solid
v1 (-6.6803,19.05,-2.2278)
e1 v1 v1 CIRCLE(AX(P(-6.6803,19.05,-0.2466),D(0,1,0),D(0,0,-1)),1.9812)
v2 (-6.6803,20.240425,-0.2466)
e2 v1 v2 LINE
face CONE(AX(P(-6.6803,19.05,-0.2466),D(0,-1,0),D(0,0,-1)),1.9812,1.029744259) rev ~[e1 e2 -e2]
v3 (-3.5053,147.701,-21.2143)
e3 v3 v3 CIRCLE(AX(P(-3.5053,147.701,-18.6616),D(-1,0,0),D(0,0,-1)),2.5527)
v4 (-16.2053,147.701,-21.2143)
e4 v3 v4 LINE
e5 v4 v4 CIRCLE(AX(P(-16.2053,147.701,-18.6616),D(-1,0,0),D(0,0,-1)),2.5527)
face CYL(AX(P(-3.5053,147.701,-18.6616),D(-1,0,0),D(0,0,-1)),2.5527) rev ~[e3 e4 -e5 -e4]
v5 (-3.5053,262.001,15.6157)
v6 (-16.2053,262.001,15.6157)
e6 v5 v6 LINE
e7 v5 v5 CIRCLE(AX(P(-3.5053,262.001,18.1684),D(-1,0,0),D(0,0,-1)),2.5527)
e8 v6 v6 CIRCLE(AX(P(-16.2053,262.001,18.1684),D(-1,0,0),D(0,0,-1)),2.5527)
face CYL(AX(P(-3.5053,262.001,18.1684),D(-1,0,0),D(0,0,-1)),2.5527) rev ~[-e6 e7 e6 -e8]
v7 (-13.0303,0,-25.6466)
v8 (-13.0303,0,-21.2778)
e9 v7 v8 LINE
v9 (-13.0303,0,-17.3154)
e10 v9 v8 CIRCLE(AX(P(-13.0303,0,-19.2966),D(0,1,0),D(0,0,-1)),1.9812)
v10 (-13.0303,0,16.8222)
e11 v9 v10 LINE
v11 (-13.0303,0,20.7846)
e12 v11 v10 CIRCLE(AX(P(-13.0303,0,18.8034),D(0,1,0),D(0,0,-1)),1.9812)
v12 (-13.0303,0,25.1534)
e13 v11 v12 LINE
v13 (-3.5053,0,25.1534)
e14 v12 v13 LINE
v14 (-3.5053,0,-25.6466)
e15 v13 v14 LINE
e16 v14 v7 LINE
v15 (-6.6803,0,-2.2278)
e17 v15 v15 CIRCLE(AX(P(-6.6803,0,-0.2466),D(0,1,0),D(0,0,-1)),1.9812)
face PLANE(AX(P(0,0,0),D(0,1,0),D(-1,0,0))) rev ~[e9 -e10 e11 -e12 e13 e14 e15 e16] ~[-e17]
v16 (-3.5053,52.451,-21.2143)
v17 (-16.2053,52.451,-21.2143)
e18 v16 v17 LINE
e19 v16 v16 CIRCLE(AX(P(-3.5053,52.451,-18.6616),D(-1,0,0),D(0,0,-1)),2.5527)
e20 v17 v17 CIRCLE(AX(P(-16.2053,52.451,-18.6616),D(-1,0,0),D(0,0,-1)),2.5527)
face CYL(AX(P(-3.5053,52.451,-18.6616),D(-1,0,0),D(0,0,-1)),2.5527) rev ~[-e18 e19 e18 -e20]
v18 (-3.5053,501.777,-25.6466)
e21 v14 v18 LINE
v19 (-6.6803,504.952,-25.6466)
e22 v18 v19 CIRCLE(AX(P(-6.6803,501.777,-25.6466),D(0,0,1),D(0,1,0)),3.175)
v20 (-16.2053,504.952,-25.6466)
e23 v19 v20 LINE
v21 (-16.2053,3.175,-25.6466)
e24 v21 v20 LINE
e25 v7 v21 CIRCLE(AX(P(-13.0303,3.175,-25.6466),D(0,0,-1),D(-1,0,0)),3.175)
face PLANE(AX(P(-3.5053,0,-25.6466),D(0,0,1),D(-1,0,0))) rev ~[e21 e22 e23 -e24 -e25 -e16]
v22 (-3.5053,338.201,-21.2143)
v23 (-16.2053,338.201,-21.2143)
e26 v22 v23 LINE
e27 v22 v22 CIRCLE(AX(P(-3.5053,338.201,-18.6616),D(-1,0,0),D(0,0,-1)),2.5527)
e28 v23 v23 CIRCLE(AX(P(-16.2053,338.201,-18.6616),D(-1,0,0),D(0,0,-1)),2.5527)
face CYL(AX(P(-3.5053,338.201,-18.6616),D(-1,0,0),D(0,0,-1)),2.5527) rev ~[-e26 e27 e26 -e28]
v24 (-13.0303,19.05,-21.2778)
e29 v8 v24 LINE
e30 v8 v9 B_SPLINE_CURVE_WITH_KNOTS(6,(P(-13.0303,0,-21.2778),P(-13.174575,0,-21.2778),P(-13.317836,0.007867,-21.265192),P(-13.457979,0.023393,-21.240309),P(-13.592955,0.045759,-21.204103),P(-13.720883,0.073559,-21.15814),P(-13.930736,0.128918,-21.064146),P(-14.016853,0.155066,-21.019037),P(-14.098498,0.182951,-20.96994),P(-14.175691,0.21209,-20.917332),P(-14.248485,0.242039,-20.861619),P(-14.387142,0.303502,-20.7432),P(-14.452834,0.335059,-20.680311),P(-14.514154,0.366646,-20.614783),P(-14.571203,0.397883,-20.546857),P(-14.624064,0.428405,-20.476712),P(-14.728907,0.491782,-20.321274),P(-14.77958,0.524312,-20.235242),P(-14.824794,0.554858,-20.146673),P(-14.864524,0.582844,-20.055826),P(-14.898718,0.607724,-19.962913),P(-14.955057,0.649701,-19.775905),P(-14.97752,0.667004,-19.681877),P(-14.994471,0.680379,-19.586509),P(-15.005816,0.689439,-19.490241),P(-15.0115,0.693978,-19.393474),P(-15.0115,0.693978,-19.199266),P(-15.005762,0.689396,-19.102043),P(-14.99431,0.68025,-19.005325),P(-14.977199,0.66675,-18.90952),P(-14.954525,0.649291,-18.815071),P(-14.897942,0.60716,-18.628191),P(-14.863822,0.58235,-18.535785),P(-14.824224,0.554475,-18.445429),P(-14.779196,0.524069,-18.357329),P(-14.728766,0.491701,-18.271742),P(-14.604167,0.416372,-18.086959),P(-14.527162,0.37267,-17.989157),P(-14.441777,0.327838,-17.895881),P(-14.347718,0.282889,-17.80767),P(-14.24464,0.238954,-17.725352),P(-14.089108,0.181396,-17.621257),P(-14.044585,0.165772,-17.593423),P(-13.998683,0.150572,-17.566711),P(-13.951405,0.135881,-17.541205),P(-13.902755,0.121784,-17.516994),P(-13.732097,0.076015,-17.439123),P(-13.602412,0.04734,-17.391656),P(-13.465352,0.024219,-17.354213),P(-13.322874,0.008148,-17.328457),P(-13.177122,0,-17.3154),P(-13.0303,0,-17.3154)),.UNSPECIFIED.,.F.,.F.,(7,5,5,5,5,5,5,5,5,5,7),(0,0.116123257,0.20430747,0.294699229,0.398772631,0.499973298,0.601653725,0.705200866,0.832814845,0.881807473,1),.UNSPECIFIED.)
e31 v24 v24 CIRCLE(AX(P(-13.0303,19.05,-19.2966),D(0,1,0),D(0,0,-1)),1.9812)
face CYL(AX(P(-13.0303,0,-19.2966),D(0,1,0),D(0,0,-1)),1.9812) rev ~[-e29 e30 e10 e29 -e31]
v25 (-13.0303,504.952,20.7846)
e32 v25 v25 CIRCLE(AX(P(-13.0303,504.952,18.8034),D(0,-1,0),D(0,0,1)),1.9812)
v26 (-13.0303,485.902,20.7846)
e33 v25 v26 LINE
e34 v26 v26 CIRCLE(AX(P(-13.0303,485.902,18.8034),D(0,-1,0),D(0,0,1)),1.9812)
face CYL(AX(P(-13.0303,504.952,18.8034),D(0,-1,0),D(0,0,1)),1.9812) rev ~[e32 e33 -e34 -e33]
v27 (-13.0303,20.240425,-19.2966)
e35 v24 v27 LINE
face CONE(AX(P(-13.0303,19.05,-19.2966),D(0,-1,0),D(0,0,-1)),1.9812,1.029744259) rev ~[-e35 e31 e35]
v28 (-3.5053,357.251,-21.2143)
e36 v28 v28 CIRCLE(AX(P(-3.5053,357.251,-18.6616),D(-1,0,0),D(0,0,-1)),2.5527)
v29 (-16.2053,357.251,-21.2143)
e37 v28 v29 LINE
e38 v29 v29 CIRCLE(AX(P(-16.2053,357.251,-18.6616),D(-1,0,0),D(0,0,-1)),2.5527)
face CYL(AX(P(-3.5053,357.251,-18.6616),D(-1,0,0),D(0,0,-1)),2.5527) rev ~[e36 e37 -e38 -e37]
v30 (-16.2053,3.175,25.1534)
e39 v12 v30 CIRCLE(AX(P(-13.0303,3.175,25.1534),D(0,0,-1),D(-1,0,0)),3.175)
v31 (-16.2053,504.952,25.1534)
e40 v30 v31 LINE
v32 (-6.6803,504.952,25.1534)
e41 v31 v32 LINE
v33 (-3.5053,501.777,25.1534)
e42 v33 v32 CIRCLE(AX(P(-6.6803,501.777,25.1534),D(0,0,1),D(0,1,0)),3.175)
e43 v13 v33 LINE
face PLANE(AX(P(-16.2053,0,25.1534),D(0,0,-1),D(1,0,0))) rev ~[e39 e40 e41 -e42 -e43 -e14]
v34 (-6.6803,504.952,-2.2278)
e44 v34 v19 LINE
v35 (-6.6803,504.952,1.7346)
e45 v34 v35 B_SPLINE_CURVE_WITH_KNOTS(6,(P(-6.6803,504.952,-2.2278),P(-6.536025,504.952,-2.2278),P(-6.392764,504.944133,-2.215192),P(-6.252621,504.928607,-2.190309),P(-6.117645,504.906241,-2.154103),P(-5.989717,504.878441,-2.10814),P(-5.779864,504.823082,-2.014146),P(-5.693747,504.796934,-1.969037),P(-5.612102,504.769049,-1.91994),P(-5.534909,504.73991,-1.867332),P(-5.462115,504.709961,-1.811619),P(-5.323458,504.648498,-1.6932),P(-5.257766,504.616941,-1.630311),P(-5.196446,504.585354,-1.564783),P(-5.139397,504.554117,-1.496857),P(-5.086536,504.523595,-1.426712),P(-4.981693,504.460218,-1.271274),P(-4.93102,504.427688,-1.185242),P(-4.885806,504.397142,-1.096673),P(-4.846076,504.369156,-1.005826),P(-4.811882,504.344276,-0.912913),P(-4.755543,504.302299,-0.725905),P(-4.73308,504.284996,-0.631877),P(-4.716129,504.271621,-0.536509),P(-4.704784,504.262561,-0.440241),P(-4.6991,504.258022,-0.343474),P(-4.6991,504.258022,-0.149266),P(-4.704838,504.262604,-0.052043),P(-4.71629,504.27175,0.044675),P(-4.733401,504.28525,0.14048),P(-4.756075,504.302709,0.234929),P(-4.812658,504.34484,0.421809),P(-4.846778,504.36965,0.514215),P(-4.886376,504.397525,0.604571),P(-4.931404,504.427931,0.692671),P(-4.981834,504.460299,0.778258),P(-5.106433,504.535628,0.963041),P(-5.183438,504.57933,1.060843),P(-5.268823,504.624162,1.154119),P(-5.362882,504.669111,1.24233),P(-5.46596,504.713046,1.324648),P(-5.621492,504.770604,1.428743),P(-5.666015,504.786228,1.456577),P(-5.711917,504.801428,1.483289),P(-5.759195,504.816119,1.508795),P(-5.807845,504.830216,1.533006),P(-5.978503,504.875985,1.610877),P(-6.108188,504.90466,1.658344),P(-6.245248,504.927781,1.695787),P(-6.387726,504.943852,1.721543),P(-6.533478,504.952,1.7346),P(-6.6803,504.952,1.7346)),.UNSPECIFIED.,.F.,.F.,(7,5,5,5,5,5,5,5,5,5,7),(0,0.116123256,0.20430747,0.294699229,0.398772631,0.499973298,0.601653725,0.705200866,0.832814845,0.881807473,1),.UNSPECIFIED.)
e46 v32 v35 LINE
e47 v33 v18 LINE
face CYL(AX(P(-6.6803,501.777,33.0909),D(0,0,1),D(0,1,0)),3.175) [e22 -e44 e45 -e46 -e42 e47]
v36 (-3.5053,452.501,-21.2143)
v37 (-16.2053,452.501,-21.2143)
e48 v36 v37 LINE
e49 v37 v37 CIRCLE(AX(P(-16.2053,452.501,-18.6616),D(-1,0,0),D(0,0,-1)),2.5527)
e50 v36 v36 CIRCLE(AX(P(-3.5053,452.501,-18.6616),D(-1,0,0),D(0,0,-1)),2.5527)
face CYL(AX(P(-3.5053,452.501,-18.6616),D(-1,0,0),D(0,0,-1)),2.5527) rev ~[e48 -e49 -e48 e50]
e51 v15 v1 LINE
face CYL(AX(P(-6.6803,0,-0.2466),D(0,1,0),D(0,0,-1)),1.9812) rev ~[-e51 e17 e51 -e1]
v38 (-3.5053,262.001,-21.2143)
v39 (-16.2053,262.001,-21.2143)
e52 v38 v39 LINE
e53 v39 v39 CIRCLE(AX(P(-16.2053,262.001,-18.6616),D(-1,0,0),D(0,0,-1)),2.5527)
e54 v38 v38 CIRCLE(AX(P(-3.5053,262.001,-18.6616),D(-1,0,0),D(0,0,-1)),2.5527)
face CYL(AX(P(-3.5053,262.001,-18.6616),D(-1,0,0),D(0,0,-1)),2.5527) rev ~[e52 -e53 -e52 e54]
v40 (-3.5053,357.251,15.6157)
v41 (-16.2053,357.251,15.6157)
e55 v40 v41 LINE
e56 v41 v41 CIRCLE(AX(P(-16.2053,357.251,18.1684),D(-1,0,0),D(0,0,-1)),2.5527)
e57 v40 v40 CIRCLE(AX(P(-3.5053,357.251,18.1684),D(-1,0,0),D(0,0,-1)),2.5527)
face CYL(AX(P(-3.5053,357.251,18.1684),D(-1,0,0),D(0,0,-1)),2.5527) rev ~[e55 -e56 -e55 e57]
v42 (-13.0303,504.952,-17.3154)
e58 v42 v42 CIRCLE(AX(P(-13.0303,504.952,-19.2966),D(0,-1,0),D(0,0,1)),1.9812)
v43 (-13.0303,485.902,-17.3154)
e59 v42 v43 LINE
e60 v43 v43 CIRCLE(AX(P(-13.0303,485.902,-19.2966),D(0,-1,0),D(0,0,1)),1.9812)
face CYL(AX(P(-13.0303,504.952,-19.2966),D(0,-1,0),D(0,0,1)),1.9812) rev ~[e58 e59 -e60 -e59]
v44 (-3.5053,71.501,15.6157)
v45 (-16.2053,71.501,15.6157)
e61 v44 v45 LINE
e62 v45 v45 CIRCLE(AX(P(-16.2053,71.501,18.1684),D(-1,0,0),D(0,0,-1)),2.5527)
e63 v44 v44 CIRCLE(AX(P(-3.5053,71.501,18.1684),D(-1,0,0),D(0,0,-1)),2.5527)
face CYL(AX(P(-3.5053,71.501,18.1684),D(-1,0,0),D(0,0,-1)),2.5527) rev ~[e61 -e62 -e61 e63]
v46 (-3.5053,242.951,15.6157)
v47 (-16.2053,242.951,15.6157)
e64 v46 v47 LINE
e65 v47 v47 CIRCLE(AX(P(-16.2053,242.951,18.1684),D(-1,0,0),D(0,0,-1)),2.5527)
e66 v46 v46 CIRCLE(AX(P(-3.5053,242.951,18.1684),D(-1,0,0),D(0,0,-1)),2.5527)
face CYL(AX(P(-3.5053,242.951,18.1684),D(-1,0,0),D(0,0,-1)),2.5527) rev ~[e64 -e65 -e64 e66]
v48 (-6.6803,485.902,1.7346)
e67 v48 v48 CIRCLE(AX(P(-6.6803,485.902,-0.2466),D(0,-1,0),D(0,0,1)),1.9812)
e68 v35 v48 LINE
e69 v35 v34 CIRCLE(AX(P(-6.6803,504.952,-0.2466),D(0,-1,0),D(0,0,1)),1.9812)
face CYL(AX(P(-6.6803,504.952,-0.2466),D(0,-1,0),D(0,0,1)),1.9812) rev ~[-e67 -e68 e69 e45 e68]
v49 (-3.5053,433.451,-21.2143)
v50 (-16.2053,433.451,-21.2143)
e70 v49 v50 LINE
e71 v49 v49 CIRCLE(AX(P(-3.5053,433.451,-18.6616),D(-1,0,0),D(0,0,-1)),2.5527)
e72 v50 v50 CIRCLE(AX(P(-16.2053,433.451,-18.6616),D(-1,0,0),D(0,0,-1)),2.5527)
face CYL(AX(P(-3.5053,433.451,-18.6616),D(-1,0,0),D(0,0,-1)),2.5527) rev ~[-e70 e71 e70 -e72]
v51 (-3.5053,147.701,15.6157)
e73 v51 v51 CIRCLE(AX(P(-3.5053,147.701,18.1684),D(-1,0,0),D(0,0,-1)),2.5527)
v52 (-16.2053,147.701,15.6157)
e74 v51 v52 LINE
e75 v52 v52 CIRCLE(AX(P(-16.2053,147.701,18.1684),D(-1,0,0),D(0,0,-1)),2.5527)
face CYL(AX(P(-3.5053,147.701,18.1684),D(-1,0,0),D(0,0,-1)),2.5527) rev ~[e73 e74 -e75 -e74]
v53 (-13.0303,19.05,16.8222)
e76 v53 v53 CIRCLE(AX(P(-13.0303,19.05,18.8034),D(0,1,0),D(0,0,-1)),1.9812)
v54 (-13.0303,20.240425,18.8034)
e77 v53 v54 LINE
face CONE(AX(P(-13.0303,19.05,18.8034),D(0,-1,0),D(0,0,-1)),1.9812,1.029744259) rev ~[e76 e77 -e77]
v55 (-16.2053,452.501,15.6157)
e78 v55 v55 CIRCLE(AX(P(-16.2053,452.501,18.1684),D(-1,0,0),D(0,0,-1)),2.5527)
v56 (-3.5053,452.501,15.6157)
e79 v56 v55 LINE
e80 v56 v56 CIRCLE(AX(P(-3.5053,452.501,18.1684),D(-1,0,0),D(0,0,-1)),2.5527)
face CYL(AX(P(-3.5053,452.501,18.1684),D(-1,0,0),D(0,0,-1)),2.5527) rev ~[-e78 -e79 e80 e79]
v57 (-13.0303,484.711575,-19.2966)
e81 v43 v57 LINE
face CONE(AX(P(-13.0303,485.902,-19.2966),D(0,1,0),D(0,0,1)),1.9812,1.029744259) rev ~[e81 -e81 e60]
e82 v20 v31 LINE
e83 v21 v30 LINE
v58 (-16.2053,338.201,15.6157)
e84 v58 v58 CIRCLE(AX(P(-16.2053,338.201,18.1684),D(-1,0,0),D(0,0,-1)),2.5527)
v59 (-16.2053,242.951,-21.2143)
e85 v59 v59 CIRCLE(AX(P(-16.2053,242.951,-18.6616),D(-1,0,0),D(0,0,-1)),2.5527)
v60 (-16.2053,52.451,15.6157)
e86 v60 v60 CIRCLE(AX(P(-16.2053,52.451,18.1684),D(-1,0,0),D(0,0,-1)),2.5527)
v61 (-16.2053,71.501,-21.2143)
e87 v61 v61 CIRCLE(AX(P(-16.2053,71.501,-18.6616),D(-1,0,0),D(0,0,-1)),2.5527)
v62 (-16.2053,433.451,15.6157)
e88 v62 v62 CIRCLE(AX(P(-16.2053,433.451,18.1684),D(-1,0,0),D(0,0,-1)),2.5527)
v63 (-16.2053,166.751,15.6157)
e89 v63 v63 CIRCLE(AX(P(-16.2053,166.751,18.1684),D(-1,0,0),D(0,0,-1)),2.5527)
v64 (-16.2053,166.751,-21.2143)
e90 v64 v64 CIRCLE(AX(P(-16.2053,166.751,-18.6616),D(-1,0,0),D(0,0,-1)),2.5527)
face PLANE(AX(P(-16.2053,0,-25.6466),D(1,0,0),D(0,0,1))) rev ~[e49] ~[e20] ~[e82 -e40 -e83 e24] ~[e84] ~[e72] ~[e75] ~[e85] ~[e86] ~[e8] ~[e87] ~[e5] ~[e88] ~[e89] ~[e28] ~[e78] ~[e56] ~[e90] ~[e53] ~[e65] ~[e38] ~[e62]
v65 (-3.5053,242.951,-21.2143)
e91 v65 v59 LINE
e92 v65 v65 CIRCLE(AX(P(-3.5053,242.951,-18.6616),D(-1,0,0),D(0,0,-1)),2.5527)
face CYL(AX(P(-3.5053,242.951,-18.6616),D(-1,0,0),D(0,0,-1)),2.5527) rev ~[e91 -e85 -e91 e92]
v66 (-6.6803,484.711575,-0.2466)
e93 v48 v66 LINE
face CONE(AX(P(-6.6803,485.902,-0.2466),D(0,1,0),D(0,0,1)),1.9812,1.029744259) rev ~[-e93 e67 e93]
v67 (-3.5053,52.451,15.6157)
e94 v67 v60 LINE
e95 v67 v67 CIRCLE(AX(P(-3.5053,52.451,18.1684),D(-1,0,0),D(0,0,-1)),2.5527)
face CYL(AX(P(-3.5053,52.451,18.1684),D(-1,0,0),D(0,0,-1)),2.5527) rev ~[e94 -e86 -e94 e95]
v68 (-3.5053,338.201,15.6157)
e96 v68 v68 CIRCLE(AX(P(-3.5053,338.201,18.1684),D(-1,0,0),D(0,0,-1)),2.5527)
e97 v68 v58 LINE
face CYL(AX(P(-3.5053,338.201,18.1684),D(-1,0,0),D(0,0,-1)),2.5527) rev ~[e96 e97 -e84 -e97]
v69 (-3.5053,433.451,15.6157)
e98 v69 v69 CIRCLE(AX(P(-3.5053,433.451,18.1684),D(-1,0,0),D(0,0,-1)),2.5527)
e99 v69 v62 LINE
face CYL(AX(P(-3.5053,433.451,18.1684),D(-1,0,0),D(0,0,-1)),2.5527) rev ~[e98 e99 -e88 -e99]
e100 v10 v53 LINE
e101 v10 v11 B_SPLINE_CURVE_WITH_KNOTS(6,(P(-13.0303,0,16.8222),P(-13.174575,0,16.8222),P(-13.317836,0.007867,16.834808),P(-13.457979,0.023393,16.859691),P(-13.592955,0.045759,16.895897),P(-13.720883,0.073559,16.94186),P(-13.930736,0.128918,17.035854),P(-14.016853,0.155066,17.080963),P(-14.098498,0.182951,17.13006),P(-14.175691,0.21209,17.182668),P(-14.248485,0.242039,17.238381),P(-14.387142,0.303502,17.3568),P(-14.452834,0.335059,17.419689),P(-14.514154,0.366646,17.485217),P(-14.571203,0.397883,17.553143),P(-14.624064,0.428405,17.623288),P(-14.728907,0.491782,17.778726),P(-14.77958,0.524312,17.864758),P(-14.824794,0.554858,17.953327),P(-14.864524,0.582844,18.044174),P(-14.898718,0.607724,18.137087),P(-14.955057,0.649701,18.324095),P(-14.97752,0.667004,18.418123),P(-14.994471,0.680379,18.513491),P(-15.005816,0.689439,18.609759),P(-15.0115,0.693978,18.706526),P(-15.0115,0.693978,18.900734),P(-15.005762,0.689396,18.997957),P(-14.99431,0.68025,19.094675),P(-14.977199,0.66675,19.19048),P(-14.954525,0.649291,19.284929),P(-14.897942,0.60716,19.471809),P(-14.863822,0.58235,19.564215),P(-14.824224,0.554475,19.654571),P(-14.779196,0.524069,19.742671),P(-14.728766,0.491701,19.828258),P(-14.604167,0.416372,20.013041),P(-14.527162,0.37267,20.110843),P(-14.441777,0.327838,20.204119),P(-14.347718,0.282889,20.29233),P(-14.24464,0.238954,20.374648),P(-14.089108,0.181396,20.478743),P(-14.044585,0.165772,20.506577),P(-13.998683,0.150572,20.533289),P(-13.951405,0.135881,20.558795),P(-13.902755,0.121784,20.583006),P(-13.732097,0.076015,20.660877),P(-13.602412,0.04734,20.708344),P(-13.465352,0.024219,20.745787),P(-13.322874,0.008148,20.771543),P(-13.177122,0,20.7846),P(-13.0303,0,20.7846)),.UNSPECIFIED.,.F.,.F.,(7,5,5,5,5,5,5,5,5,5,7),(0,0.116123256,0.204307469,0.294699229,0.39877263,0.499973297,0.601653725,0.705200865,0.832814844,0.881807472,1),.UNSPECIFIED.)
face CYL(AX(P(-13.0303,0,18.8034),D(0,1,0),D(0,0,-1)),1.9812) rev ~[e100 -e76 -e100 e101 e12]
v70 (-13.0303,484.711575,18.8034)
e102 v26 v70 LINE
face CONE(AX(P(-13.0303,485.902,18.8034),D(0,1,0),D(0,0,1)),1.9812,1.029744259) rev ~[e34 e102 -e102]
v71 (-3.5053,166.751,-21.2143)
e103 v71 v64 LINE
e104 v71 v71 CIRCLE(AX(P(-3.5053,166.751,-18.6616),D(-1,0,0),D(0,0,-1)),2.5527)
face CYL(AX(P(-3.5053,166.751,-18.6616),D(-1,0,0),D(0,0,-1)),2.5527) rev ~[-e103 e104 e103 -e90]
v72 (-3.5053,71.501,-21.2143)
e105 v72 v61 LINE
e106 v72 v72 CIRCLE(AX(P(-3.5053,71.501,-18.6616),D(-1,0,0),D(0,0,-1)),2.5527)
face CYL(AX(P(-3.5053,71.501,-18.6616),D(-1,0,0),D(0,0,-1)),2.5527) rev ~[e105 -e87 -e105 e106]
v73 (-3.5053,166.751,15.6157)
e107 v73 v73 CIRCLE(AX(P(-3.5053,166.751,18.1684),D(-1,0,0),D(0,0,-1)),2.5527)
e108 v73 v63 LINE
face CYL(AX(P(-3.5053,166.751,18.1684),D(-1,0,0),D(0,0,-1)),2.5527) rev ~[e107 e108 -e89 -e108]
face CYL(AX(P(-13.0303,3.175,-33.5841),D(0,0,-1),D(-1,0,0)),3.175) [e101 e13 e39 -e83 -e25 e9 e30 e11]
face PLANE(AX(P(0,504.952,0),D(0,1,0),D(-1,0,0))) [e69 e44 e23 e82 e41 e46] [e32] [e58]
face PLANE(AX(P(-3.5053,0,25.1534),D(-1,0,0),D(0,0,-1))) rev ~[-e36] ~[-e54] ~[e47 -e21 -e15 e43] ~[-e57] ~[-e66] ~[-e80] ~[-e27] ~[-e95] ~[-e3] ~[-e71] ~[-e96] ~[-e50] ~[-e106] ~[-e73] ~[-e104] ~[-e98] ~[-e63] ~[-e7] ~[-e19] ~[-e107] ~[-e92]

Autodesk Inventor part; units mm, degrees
ref_plane "YZ Plane" through (0, 0, 0) normal (1, 0, 0) x (0, 1, 0)
ref_plane "XZ Plane" through (0, 0, 0) normal (0, 1, 0) x (-1, 0, 0)
ref_plane "XY Plane" through (0, 0, 0) normal (0, 0, 1) x (1, 0, 0)
sketch "Sketch1" plane through (0, 0, 0) normal (0, 1, 0) x (-1, 0, 0)
  line L0 (16.2053, 25.1534) -> (3.5053, 25.1534)
  line L1 (3.5053, 25.1534) -> (3.5053, -25.6466)
  line L2 (3.5053, -25.6466) -> (16.2053, -25.6466)
  line L3 (16.2053, -25.6466) -> (16.2053, 25.1534)
  point P0 (0, 0)
  dimension "d0" = 50.8
  dimension "d1" = 12.7
extrude "Extrusion1" add sketch "Sketch1" along normal blind 504.952
sketch "Sketch2" plane through (-3.5053, 0, 25.1534) normal (1, 0, 0) x (0, 0, -1)
  line L0 (6.985, 52.451) -> (6.985, 71.501) construction
  line L1 (6.985, 71.501) -> (43.815, 71.501) construction
  line L2 (43.815, 71.501) -> (43.815, 52.451) construction
  line L3 (43.815, 52.451) -> (6.985, 52.451) construction
  line L4 (6.985, 61.976) -> (0, 61.976) construction
  line L5 (0, 0) -> (0, 504.952) construction
  line L6 (43.815, 61.976) -> (50.8, 61.976) construction
  line L7 (50.8, 0) -> (50.8, 504.952) construction
  line L8 (6.985, 147.701) -> (6.985, 166.751) construction
  line L9 (6.985, 157.226) -> (0, 157.226) construction
  line L10 (6.985, 166.751) -> (43.815, 166.751) construction
  line L11 (43.815, 147.701) -> (6.985, 147.701) construction
  line L12 (43.815, 166.751) -> (43.815, 147.701) construction
  line L13 (43.815, 157.226) -> (50.8, 157.226) construction
  line L14 (6.985, 242.951) -> (6.985, 262.001) construction
  line L15 (6.985, 252.476) -> (0, 252.476) construction
  line L16 (6.985, 262.001) -> (43.815, 262.001) construction
  line L17 (43.815, 242.951) -> (6.985, 242.951) construction
  line L18 (43.815, 262.001) -> (43.815, 242.951) construction
  line L19 (43.815, 252.476) -> (50.8, 252.476) construction
  line L20 (6.985, 338.201) -> (6.985, 357.251) construction
  line L21 (6.985, 347.726) -> (0, 347.726) construction
  line L22 (6.985, 357.251) -> (43.815, 357.251) construction
  line L23 (43.815, 338.201) -> (6.985, 338.201) construction
  line L24 (43.815, 357.251) -> (43.815, 338.201) construction
  line L25 (43.815, 347.726) -> (50.8, 347.726) construction
  line L26 (6.985, 433.451) -> (6.985, 452.501) construction
  line L27 (6.985, 442.976) -> (0, 442.976) construction
  line L28 (6.985, 452.501) -> (43.815, 452.501) construction
  line L29 (43.815, 433.451) -> (6.985, 433.451) construction
  line L30 (43.815, 452.501) -> (43.815, 433.451) construction
  line L31 (43.815, 442.976) -> (50.8, 442.976) construction
  point P0 (25.1534, 0)
  dimension "d4" = 36.83
  dimension "d5" = 19.05
  dimension "d6" = 6.985
  dimension "d9" = 95.25
hole "Hole1" at (-3.5053, 52.451, 18.1684) at (-3.5053, 52.451, -18.6616) at (-3.5053, 71.501, -18.6616) at (-3.5053, 71.501, 18.1684) at (-3.5053, 147.701, 18.1684) at (-3.5053, 166.751, 18.1684) at (-3.5053, 166.751, -18.6616) at (-3.5053, 147.701, -18.6616) at (-3.5053, 242.951, 18.1684) at (-3.5053, 262.001, 18.1684) at (-3.5053, 262.001, -18.6616) at (-3.5053, 242.951, -18.6616) at (-3.5053, 338.201, 18.1684) at (-3.5053, 357.251, 18.1684) at (-3.5053, 357.251, -18.6616) at (-3.5053, 338.201, -18.6616) at (-3.5053, 433.451, 18.1684) at (-3.5053, 452.501, 18.1684) at (-3.5053, 452.501, -18.6616) at (-3.5053, 433.451, -18.6616) direction (-1, 0, 0) diameter 5.1054 end through all clearance for "Socket Head Cap Screw" size "#10" standard "Ansi Unified Screw Threads"
sketch "Sketch3" plane through (0, 0, 0) normal (0, -1, 0) x (1, 0, 0)
  line L0 (-3.5053, 25.1534) -> (-3.5053, -25.6466) construction
  line L1 (-3.5053, -0.2466) -> (-16.2053, -0.2466) construction
  line L2 (-16.2053, -25.6466) -> (-16.2053, 25.1534) construction
  line L3 (-13.0303, 18.8034) -> (-13.0303, -0.2466) construction
  line L4 (-13.0303, -19.2966) -> (-13.0303, -0.2466) construction
  line L5 (-16.2053, 25.1534) -> (-3.5053, 25.1534) construction
  point P0 (0, 0)
  point P1 (-6.6803, -0.2466)
  dimension "d21" = 3.175
  dimension "d22" = 3.175
  dimension "d23" = 6.35
hole "Hole2" at (-13.0303, 0, 18.8034) at (-6.6803, 0, -0.2466) at (-13.0303, 0, -19.2966) direction (0, 1, 0) diameter 3.9624 depth 19.05 tip angle 118 thread size "10-32 UNF" class "2B" standard "ANSI Unified Screw Threads"
sketch "Sketch4" plane through (0, 504.952, 0) normal (0, 1, 0) x (1, 0, 0)
  circle A0 centre (-6.6803, 0.2466) radius 1.9812 construction
  circle A1 centre (-13.0303, 19.2966) radius 1.9812 construction
  circle A2 centre (-13.0303, -18.8034) radius 1.9812 construction
  point P0 (0, 0)
  dimension "d38" = 6.35
  dimension "d39" = 38.1
hole "Hole3" at (-6.6803, 504.952, -0.2466) at (-13.0303, 504.952, -19.2966) at (-13.0303, 504.952, 18.8034) direction (0, -1, 0) diameter 3.9624 depth 19.05 tip angle 118 thread size "10-32 UNF" class "2B" standard "ANSI Unified Screw Threads"
fillet "Fillet1" radius 3.175 2 edges at (-16.2053, 0, -0.2466) (-3.5053, 504.952, -0.2466)
properties part number "Winch_Plate_Front" material "Aluminum 6061"
